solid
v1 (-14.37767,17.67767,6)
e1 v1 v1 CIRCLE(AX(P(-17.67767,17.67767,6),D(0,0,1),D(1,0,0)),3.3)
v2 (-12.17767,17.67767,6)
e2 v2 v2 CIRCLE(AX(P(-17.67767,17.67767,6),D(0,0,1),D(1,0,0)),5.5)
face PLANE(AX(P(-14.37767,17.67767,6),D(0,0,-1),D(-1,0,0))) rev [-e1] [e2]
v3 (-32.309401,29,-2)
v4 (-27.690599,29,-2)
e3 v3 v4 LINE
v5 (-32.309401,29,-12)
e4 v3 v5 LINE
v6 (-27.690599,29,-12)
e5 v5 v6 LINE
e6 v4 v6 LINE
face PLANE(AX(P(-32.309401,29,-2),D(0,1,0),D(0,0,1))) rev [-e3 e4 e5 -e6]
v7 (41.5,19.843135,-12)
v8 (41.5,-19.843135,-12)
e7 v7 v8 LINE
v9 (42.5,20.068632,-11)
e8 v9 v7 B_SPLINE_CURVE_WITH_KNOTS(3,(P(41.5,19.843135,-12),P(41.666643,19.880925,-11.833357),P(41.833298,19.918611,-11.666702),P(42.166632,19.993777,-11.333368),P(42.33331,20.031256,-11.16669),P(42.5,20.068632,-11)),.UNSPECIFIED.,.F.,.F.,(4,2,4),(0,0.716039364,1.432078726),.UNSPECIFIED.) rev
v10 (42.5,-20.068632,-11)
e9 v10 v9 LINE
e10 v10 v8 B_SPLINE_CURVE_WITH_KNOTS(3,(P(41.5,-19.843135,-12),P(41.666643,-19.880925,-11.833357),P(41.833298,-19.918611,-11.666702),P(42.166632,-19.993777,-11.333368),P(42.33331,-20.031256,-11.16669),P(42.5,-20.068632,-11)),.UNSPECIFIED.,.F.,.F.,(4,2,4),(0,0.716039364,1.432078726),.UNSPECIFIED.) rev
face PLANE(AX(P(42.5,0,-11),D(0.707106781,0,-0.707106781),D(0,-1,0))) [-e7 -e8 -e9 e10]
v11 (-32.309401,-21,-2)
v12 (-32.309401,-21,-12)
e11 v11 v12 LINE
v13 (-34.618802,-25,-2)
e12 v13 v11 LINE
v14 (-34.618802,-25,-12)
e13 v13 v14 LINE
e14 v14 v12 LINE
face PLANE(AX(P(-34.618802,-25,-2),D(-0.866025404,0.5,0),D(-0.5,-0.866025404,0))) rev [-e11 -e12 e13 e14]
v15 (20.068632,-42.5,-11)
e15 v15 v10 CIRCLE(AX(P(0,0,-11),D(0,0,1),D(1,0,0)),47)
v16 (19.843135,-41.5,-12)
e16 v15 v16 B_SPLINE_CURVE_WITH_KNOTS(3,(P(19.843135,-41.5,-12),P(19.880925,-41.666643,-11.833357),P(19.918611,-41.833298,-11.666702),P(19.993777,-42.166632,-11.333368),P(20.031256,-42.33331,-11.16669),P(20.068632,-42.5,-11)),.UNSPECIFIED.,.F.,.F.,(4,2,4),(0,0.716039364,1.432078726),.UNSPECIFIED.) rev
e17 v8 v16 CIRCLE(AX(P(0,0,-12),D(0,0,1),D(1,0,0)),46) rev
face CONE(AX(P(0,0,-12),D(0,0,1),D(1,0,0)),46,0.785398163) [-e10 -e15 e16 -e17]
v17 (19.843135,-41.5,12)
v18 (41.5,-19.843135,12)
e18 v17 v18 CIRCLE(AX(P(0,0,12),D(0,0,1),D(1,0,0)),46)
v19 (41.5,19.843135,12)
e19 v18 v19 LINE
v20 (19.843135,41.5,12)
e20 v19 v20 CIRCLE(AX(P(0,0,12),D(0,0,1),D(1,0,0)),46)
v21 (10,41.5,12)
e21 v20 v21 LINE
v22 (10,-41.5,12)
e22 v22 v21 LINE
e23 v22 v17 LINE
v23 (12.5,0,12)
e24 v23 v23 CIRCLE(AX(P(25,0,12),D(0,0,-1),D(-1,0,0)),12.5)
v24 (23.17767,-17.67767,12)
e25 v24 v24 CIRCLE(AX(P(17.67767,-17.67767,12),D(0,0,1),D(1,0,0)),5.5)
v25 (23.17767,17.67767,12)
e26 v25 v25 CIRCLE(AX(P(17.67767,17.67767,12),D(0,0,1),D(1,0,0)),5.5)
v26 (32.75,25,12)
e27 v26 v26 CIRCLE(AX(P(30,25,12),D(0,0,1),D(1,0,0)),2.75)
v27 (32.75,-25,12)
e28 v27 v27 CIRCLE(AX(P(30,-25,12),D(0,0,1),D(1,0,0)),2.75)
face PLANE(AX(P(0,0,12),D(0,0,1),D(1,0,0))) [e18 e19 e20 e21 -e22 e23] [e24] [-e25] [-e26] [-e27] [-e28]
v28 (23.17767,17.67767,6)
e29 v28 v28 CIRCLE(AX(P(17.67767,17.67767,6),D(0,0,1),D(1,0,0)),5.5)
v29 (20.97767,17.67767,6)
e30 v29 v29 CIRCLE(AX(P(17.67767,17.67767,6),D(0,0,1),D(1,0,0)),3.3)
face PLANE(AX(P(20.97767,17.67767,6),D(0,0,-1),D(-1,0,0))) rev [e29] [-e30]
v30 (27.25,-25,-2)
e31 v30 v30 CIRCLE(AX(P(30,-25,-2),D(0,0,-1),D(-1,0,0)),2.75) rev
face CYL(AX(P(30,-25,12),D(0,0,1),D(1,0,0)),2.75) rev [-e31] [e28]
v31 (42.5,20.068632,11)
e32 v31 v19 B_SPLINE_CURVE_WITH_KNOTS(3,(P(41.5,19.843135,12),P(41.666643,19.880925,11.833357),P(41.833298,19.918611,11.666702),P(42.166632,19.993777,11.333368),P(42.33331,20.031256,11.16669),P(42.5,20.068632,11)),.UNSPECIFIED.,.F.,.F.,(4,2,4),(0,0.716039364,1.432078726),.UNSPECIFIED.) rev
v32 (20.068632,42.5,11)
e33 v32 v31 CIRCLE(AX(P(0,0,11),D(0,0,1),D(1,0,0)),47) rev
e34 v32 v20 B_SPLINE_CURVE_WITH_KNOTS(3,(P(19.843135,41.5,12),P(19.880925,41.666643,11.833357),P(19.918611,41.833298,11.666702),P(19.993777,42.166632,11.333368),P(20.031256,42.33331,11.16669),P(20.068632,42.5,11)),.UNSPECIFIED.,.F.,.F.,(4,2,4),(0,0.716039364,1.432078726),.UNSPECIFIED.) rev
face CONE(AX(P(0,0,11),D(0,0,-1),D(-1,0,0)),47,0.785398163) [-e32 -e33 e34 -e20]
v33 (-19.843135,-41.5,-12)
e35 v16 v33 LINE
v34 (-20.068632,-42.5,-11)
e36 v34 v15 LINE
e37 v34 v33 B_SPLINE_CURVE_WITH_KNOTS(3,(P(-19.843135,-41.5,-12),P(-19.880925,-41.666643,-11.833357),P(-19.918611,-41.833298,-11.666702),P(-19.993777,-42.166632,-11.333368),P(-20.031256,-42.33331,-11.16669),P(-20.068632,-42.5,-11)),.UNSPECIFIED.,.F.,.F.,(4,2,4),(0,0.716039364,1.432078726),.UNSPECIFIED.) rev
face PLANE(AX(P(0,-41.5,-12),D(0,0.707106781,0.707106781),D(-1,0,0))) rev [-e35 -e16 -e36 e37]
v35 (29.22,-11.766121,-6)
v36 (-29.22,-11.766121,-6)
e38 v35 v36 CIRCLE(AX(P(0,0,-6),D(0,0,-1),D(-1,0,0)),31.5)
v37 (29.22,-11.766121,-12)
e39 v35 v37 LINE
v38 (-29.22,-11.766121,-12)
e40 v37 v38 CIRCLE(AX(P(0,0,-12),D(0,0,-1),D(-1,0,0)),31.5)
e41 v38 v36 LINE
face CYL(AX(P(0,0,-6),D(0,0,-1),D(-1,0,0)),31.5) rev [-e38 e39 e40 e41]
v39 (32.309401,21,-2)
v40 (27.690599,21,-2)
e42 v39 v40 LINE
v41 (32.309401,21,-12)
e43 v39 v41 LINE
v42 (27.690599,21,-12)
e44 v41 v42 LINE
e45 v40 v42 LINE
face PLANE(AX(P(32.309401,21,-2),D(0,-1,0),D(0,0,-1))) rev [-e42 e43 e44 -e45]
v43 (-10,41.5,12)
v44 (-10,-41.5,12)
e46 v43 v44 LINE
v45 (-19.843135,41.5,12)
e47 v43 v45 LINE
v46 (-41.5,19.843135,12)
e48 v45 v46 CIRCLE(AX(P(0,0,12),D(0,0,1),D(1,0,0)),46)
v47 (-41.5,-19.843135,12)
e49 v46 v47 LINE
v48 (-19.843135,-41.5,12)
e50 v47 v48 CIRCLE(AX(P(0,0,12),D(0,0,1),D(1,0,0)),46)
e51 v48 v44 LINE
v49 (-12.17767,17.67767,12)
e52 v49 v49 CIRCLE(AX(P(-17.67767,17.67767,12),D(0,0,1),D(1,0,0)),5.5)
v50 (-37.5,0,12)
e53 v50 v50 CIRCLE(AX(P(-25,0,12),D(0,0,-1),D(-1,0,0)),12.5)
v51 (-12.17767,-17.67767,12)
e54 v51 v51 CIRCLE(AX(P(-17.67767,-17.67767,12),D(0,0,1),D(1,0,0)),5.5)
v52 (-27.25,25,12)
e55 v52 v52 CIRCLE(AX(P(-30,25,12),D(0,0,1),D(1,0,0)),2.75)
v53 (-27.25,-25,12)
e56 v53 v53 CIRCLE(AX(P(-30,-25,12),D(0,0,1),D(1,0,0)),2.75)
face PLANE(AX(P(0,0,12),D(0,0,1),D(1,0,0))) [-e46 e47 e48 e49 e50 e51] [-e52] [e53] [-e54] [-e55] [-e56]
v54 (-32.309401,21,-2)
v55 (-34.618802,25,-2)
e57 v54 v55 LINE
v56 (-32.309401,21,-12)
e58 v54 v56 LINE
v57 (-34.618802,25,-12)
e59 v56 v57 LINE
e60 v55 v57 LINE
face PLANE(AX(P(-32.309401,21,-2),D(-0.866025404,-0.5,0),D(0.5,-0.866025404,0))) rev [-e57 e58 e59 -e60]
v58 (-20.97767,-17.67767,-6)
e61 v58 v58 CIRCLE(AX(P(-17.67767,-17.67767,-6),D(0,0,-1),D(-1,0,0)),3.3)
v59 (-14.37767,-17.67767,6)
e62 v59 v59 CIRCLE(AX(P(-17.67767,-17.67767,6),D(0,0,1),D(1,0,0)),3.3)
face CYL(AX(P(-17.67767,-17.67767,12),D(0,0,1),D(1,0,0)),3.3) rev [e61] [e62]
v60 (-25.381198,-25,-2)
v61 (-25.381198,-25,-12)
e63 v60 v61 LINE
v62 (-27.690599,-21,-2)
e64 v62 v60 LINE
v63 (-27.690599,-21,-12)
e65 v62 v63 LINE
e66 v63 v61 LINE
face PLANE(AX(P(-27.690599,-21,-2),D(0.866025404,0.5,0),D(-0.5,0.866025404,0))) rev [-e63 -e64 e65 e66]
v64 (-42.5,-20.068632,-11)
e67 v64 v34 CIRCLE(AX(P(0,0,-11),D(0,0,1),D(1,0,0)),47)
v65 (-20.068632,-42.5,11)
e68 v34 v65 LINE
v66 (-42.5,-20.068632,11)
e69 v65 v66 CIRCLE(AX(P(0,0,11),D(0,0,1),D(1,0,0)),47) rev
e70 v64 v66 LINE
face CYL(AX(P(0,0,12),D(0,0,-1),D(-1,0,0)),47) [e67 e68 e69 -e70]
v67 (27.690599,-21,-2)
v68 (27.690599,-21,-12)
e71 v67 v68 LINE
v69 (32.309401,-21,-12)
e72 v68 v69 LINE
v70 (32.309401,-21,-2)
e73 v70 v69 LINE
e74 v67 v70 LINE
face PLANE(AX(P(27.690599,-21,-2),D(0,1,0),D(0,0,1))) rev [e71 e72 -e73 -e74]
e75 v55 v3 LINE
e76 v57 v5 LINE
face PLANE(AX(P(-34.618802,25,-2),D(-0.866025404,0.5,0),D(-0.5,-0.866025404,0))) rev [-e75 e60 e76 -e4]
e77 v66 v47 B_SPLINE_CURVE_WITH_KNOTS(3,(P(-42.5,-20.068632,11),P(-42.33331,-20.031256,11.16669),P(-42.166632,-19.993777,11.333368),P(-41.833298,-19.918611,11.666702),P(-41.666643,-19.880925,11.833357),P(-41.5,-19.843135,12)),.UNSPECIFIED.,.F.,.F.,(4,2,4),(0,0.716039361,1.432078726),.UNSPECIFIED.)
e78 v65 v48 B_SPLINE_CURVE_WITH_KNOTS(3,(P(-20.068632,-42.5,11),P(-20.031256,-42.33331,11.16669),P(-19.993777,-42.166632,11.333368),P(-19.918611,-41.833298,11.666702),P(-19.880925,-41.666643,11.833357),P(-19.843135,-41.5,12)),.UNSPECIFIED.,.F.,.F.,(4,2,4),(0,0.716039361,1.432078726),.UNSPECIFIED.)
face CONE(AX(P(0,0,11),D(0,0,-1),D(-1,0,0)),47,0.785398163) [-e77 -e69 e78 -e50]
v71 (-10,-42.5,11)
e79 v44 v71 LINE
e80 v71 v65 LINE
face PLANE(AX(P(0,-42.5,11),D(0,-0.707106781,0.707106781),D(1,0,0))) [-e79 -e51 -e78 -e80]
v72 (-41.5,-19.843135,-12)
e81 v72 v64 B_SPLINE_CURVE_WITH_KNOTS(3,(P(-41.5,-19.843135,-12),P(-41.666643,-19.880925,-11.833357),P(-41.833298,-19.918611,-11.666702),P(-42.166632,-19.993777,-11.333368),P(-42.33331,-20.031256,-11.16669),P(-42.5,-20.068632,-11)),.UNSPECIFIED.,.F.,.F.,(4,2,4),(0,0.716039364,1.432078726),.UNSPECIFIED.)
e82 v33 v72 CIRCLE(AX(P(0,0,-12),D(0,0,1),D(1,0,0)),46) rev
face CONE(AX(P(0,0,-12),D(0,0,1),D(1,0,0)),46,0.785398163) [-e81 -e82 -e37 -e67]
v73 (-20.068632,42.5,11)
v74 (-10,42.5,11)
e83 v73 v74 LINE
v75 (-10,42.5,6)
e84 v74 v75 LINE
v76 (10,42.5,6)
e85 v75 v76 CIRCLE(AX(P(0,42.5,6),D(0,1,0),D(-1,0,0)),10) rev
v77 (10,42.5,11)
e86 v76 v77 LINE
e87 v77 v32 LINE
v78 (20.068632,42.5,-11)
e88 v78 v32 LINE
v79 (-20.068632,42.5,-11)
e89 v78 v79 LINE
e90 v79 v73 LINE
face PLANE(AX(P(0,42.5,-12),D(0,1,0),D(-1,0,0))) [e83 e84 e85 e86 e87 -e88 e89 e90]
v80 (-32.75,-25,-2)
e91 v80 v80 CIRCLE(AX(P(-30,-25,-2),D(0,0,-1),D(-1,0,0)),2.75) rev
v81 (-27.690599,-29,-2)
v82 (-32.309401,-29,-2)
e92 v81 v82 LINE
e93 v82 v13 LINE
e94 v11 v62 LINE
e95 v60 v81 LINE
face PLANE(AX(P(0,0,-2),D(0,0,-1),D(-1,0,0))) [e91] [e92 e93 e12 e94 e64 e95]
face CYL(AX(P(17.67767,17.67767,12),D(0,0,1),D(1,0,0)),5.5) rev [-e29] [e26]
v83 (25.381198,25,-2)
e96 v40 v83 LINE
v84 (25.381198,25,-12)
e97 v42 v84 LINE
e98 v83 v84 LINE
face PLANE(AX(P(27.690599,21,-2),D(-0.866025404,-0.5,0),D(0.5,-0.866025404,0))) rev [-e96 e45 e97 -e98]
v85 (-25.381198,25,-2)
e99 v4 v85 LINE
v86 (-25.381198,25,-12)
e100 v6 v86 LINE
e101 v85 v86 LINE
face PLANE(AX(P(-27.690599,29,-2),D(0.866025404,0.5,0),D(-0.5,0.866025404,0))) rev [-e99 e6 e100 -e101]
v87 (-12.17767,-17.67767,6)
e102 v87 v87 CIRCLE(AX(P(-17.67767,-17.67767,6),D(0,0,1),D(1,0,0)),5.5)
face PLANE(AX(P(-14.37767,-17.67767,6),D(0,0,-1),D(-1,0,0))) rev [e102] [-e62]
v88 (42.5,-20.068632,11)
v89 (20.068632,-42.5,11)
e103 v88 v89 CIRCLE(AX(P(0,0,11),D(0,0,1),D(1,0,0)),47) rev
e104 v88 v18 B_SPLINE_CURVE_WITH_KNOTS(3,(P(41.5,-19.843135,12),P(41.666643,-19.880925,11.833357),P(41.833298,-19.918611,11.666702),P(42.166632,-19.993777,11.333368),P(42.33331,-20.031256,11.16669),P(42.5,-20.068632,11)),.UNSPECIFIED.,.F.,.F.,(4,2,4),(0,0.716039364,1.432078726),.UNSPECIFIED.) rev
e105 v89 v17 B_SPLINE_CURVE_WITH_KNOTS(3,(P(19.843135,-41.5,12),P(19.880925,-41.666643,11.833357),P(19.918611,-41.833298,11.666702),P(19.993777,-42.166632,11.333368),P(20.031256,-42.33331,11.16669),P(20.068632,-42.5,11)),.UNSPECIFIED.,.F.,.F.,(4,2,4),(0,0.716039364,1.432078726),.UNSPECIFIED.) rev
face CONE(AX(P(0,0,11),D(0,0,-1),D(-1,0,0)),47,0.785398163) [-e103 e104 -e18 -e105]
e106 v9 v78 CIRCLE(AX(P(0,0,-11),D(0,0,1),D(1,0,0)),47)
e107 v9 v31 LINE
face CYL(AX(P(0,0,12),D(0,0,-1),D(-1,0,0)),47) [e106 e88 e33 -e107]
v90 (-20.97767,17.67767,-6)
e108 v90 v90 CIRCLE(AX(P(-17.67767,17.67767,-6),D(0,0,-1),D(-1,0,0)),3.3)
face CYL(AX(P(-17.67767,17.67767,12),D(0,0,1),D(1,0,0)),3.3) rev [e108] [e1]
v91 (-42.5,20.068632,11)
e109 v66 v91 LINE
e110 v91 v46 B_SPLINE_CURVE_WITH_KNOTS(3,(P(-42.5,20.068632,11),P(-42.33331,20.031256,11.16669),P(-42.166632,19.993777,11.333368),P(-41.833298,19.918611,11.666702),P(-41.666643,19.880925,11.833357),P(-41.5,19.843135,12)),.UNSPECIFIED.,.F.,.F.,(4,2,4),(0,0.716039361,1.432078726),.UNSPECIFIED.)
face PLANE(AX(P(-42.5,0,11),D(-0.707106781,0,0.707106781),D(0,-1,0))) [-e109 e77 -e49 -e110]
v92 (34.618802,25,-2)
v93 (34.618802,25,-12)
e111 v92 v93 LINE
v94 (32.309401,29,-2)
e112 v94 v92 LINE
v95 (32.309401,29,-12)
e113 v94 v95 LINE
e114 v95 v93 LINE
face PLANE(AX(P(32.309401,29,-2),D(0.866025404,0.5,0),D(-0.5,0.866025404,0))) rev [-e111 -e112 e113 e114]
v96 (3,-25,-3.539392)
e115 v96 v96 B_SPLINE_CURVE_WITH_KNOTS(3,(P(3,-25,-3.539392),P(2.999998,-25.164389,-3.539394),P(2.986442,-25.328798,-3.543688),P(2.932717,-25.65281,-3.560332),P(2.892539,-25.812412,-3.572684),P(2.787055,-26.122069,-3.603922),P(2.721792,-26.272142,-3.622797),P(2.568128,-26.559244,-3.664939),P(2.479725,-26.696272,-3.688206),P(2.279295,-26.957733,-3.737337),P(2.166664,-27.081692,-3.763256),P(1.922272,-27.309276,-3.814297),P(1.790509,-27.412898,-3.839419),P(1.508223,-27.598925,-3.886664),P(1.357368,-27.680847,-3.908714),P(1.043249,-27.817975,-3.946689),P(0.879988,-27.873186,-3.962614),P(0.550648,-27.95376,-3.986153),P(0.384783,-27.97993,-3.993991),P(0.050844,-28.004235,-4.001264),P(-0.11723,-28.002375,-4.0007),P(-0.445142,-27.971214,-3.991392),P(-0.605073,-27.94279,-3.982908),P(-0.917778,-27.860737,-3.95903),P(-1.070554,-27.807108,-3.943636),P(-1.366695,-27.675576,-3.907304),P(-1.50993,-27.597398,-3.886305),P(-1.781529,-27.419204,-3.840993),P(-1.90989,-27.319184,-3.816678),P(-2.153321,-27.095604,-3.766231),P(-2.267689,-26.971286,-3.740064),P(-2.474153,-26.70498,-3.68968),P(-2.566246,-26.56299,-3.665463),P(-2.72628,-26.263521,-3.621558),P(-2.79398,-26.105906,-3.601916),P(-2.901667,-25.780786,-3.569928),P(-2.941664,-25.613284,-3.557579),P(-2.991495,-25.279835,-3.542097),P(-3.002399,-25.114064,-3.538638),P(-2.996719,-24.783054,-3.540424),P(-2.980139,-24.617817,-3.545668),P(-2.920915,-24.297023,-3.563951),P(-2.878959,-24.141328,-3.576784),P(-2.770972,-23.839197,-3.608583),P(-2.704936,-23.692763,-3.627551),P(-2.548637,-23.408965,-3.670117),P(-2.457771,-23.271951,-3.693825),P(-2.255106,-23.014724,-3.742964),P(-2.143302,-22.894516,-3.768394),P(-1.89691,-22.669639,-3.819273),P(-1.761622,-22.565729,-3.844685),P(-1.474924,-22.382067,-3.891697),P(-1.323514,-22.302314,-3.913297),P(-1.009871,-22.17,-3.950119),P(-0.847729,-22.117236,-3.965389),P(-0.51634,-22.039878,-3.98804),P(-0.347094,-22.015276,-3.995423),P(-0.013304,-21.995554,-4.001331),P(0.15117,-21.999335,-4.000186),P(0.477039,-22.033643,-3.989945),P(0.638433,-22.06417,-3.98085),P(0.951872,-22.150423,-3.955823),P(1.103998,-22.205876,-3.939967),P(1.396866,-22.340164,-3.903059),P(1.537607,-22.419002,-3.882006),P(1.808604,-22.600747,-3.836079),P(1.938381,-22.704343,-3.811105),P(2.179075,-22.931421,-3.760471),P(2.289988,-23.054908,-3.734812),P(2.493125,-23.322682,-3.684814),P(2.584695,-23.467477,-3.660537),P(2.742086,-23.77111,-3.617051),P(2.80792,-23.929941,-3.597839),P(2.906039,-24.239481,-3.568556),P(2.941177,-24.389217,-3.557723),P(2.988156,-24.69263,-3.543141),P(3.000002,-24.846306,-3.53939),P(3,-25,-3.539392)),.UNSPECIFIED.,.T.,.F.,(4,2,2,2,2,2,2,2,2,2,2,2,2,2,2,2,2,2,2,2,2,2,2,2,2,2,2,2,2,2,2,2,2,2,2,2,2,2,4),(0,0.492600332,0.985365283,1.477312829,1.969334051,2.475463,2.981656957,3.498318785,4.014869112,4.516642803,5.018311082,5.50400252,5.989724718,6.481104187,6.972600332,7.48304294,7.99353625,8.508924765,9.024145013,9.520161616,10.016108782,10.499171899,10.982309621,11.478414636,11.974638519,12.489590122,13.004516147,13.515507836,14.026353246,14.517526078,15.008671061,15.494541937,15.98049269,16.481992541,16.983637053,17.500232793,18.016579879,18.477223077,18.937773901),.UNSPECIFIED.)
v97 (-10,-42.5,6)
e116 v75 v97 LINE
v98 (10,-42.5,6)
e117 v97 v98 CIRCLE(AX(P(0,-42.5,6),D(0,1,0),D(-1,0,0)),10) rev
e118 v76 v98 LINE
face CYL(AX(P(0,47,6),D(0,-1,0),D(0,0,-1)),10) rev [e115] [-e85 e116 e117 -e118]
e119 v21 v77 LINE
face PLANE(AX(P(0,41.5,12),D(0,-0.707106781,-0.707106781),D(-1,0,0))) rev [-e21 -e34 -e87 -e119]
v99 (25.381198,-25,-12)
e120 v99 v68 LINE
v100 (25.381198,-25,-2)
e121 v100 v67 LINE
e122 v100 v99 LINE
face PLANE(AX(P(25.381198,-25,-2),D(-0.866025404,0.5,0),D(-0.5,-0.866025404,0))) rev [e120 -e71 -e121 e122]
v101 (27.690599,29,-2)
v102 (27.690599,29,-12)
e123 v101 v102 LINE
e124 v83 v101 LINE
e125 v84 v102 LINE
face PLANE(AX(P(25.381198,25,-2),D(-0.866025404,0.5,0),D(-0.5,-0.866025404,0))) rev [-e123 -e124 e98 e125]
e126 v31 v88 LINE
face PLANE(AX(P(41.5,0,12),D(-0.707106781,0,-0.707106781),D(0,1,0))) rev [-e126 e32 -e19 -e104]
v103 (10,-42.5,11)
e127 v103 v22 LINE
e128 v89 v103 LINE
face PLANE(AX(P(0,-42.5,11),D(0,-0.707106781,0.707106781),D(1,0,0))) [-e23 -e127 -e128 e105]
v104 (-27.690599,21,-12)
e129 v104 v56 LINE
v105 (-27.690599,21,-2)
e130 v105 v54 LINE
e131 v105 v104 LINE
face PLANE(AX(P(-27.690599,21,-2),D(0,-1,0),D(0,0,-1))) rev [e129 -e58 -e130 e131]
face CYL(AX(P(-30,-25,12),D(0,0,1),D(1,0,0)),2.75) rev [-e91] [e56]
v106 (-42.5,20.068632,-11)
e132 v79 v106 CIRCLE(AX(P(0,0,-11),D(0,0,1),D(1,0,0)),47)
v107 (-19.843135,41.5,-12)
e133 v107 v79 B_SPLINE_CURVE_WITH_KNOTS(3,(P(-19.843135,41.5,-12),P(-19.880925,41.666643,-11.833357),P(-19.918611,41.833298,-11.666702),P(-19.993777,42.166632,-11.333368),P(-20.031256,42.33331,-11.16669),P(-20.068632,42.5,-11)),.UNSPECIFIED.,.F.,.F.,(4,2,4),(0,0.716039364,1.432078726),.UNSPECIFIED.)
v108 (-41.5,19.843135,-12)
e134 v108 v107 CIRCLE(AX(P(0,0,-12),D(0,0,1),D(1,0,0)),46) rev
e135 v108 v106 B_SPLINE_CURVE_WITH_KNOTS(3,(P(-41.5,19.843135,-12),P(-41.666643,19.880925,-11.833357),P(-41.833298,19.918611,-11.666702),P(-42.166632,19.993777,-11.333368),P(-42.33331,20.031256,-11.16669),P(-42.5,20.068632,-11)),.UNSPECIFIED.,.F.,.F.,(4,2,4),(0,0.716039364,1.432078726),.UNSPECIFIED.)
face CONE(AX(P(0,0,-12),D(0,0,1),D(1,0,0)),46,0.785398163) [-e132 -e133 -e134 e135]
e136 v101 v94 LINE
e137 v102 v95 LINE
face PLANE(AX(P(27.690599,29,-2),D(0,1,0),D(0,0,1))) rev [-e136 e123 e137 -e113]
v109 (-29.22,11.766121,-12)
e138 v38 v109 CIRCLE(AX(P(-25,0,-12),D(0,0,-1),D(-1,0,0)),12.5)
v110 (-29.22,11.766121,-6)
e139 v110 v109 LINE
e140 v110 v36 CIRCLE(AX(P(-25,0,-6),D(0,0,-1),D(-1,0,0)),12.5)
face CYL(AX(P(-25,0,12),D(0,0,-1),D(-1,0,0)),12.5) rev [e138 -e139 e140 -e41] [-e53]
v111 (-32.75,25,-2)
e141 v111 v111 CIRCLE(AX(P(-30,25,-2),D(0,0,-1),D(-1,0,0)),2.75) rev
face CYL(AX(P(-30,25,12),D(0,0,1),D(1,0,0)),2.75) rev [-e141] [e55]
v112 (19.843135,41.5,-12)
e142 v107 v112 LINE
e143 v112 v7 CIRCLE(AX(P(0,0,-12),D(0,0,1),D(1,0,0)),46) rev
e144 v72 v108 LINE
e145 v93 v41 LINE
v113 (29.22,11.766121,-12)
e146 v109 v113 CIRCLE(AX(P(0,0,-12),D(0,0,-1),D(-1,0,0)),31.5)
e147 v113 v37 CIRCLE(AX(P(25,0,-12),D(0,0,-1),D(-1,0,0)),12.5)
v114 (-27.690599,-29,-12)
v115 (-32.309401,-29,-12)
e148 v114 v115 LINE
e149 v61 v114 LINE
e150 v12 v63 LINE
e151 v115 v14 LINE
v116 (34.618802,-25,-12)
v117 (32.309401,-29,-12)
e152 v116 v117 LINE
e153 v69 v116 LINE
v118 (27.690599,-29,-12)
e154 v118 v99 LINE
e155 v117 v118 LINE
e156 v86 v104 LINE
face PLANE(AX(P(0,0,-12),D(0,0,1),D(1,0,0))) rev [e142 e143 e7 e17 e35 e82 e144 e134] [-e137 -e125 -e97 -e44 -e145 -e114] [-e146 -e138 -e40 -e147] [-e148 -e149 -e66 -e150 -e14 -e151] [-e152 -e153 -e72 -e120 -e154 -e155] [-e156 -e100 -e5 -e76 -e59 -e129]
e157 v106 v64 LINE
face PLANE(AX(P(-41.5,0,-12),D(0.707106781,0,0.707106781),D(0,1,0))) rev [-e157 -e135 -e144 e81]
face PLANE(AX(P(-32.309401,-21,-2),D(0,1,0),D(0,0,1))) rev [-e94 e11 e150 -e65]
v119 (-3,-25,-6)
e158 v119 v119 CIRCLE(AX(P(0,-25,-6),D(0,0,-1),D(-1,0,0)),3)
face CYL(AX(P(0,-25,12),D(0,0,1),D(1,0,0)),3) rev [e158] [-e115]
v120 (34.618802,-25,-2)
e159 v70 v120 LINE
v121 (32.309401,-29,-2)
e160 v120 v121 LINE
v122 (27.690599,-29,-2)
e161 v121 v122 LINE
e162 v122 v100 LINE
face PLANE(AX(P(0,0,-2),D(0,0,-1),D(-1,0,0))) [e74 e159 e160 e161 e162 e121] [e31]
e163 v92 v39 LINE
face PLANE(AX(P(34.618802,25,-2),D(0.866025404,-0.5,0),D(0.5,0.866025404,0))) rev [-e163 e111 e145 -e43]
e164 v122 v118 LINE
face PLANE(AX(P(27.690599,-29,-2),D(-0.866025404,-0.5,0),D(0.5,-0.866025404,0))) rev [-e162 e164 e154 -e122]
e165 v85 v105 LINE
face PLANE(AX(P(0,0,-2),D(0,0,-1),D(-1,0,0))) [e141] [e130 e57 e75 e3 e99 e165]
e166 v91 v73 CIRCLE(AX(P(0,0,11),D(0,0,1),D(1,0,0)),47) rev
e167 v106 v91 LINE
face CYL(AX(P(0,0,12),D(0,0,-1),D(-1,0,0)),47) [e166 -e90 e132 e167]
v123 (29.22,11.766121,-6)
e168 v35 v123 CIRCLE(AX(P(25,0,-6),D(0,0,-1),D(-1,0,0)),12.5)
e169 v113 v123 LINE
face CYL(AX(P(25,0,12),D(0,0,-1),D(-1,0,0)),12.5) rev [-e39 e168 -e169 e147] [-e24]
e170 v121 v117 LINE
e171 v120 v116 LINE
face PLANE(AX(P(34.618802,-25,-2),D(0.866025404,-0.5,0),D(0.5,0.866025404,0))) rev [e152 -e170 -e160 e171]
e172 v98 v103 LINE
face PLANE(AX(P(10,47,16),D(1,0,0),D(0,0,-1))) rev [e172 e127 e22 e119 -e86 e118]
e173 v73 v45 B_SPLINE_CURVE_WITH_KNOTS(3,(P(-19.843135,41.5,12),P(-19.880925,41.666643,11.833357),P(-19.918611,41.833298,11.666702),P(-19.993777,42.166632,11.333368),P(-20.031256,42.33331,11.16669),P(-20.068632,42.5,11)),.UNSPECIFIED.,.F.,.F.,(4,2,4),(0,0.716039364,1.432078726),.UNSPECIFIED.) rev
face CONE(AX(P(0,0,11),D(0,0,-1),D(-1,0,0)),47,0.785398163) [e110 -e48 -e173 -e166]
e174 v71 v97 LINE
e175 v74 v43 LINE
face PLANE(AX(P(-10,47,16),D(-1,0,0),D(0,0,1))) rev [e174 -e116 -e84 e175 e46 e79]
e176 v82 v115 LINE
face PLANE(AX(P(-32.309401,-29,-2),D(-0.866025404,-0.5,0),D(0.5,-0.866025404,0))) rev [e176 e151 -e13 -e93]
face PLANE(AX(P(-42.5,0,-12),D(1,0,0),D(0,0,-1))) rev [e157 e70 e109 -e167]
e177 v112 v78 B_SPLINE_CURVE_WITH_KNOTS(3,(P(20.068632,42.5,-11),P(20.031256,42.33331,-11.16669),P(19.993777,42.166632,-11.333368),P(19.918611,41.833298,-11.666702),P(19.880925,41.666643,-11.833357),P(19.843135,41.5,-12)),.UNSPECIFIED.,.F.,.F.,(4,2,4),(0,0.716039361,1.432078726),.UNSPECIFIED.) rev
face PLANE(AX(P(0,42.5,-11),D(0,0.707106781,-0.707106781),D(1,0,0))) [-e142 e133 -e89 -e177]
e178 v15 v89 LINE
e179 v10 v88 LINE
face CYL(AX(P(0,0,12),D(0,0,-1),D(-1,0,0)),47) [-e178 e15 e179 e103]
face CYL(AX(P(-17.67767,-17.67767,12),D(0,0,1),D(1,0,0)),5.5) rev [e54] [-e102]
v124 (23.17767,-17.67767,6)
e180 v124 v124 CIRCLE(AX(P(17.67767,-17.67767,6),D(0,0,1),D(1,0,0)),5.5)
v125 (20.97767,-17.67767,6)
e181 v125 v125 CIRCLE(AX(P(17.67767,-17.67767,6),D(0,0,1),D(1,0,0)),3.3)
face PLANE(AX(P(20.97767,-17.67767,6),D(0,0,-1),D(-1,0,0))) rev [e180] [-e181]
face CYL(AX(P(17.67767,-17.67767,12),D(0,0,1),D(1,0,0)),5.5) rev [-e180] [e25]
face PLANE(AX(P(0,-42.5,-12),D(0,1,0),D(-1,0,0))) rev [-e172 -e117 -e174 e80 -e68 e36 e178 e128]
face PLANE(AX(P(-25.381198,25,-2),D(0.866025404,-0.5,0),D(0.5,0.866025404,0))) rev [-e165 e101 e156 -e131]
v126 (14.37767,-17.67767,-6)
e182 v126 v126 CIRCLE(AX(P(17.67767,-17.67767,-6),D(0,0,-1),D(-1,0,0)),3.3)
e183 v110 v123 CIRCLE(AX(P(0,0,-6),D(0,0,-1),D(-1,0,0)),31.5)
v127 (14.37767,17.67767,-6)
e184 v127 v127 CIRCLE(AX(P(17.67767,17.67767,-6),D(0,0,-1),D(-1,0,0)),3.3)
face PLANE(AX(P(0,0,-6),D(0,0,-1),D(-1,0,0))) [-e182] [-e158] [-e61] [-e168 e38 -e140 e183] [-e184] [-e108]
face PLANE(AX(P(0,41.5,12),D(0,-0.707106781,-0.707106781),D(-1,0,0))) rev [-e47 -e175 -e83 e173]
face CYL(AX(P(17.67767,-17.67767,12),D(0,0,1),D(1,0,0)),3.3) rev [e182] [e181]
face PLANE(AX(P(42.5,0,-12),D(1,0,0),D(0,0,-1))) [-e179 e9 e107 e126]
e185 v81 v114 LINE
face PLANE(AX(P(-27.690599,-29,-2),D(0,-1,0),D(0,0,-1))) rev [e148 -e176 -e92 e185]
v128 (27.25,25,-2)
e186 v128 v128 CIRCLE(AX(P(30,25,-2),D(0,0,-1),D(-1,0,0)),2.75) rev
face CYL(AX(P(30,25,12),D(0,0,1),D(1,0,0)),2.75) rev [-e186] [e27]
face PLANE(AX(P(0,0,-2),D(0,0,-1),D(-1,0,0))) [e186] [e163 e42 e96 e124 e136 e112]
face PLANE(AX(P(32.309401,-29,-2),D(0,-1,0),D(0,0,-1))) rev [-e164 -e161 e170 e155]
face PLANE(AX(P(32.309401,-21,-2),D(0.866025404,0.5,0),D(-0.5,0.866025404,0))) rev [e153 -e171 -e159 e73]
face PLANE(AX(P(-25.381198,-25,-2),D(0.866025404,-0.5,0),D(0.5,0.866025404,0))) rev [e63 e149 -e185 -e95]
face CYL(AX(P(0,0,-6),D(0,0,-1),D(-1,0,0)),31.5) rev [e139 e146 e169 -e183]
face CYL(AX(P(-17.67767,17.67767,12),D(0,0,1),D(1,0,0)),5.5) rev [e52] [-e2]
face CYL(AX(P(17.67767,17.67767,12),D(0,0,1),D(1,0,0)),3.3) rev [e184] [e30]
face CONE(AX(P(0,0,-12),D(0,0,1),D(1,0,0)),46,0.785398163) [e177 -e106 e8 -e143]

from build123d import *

# Parameters (mm, degrees)
SKETCH1_W                        = 70
SKETCH1_H                        = 50
BOSS_EXTRUDE1_DEPTH              = 12
SKETCH4_R                        = 47
BOSS_EXTRUDE2_DEPTH              = 24
SKETCH2_R                        = 31.5
CUT_EXTRUDE1_DEPTH               = 6
CBORE_START                      = -6
CBORE_FOR_M6_SHCS1_OUTLINE_R     = 3.3
CBORE_FOR_M6_SHCS1_DEPTH         = 18
CBORE_START_2                    = 6
CBORE_FOR_M6_SHCS1_2_OUTLINE_R   = 5.5
CBORE_FOR_M6_SHCS1_2_OUTLINE_R_2 = 3.3
CBORE_FOR_M6_SHCS1_2_DEPTH       = 6
CUT_EXTRUDE6_DEPTH               = 68.542579163
CUT_EXTRUDE6_DEPTH_BACK          = 68.542579163
M5_CLEARANCE_HOLE2_D             = 5.5
F_6_0MM_PRESS_DOWEL_HOLE2_D      = 6
SKETCH22_R                       = 12.5
CUT_EXTRUDE7_DEPTH               = 71.668239144
CUT_EXTRUDE8_DEPTH               = 10
CUT_EXTRUDE9_DEPTH               = 71.668239144
CHAMFER2_SIZE                    = 1


# Read off the part's stored shape, not the designer's step: CBORE for M6 SHCS1
with BuildPart() as part:
    # Sketch1 → Boss-Extrude1 (new, symmetric)
    with BuildSketch(Plane.XY):
        Rectangle(SKETCH1_W, SKETCH1_H)
    extrude(amount=BOSS_EXTRUDE1_DEPTH, both=True)

    # Sketch4 → Boss-Extrude2 (add, through all)
    with BuildSketch(Plane(origin=(0, 0, -12), x_dir=(-1, 0, 0), z_dir=(0, 0, -1))):
        Circle(SKETCH4_R)
    extrude(amount=-BOSS_EXTRUDE2_DEPTH)

    # Sketch2 → Cut-Extrude1 (cut)
    with BuildSketch(Plane(origin=(0, 0, -12), x_dir=(-1, 0, 0), z_dir=(0, 0, -1))):
        Circle(SKETCH2_R)
    extrude(amount=-CUT_EXTRUDE1_DEPTH, mode=Mode.SUBTRACT)

    # CBORE for M6 SHCS1 outline → CBORE for M6 SHCS1 (cut)
    with BuildSketch(Plane.XY.offset(CBORE_START)):
        with Locations((-17.67766953, -17.67766953)):
            Circle(CBORE_FOR_M6_SHCS1_OUTLINE_R)
        with Locations((-17.67766953, 17.67766953)):
            Circle(CBORE_FOR_M6_SHCS1_OUTLINE_R)
        with Locations((17.67766953, 17.67766953)):
            Circle(CBORE_FOR_M6_SHCS1_OUTLINE_R)
        with Locations((17.67766953, -17.67766953)):
            Circle(CBORE_FOR_M6_SHCS1_OUTLINE_R)
    extrude(amount=CBORE_FOR_M6_SHCS1_DEPTH, mode=Mode.SUBTRACT)

    # CBORE for M6 SHCS1 2 outline → CBORE for M6 SHCS1 2 (cut)
    # profile 1 of 4: a face of its own
    with BuildSketch(Plane.XY.offset(CBORE_START_2)):
        with Locations((-17.67766953, -17.67766953)):
            Circle(CBORE_FOR_M6_SHCS1_2_OUTLINE_R)
        with Locations((-17.67766953, -17.67766953)):
            Circle(CBORE_FOR_M6_SHCS1_2_OUTLINE_R_2, mode=Mode.SUBTRACT)
    # profile 2 of 4: a face of its own
    with BuildSketch(Plane.XY.offset(CBORE_START_2)):
        with Locations((-17.67766953, 17.67766953)):
            Circle(CBORE_FOR_M6_SHCS1_2_OUTLINE_R)
        with Locations((-17.67766953, 17.67766953)):
            Circle(CBORE_FOR_M6_SHCS1_2_OUTLINE_R_2, mode=Mode.SUBTRACT)
    # profile 3 of 4: a face of its own
    with BuildSketch(Plane.XY.offset(CBORE_START_2)):
        with Locations((17.67766953, 17.67766953)):
            Circle(CBORE_FOR_M6_SHCS1_2_OUTLINE_R)
        with Locations((17.67766953, 17.67766953)):
            Circle(CBORE_FOR_M6_SHCS1_2_OUTLINE_R_2, mode=Mode.SUBTRACT)
    # profile 4 of 4: a face of its own
    with BuildSketch(Plane.XY.offset(CBORE_START_2)):
        with Locations((17.67766953, -17.67766953)):
            Circle(CBORE_FOR_M6_SHCS1_2_OUTLINE_R)
        with Locations((17.67766953, -17.67766953)):
            Circle(CBORE_FOR_M6_SHCS1_2_OUTLINE_R_2, mode=Mode.SUBTRACT)
    extrude(amount=CBORE_FOR_M6_SHCS1_2_DEPTH, mode=Mode.SUBTRACT)

    # Sketch17 → Cut-Extrude6 (cut, two sides: drawn at the far end of the back side and taken through both)
    with BuildSketch(Plane.XZ.offset(-CUT_EXTRUDE6_DEPTH_BACK)):
        with BuildLine():
            Line((10, 16), (10, 6))
            ThreePointArc((10, 6), (0, -4), (-10, 6))
            Line((-10, 6), (-10, 16))
            ThreePointArc((-10, 16), (0, 26), (10, 16))
        make_face()
    extrude(amount=CUT_EXTRUDE6_DEPTH + CUT_EXTRUDE6_DEPTH_BACK, mode=Mode.SUBTRACT)

    # M5 Clearance Hole2 (through all)
    with Locations(Plane.XY.offset(12)):
        with Locations((-30, 25), (-30, -25), (30, -25), (30, 25)):
            Hole(M5_CLEARANCE_HOLE2_D / 2)

    # Ø6.0mm Press Dowel Hole2 (through all)
    with Locations(Plane.XY.offset(12)):
        with Locations((0, -25)):
            Hole(F_6_0MM_PRESS_DOWEL_HOLE2_D / 2)

    # Sketch22 → Cut-Extrude7 (cut, through all)
    with BuildSketch(Plane(origin=(0, 0, -12), x_dir=(-1, 0, 0), z_dir=(0, 0, -1))):
        with Locations((-25, 0)):
            Circle(SKETCH22_R)
        with Locations((25, 0)):
            Circle(SKETCH22_R)
    extrude(amount=-CUT_EXTRUDE7_DEPTH, mode=Mode.SUBTRACT)

    # Sketch23 → Cut-Extrude8 (cut)
    with BuildSketch(Plane(origin=(0, 0, -12), x_dir=(-1, 0, 0), z_dir=(0, 0, -1))):
        Polygon((-27.690598923, 29), (-32.309401077, 29), (-34.618802154, 25), (-32.309401077, 21), (-27.690598923, 21), (-25.381197846, 25), align=None)
        Polygon((-32.309401077, -21), (-34.618802154, -25), (-32.309401077, -29), (-27.690598923, -29), (-25.381197846, -25), (-27.690598923, -21), align=None)
        Polygon((32.309401077, -21), (27.690598923, -21), (25.381197846, -25), (27.690598923, -29), (32.309401077, -29), (34.618802154, -25), align=None)
        Polygon((27.690598923, 29), (25.381197846, 25), (27.690598923, 21), (32.309401077, 21), (34.618802154, 25), (32.309401077, 29), align=None)
    extrude(amount=-CUT_EXTRUDE8_DEPTH, mode=Mode.SUBTRACT)

    # Sketch24 → Cut-Extrude9 (cut, through all)
    with BuildSketch(Plane.XY.offset(12)):
        with BuildLine():
            ThreePointArc((-20.06863224, -42.5), (-15.131468813, -44.497625235), (-10, -45.923850013))
            Line((-10, -45.923850013), (-10, -42.5))
            Line((-10, -42.5), (-20.06863224, -42.5))
        make_face()
        with BuildLine():
            Line((-10, -42.5), (-10, -45.923850013))
            ThreePointArc((-10, -45.923850013), (0, -47), (10, -45.923850013))
            Line((10, -45.923850013), (10, -42.5))
            Line((10, -42.5), (-10, -42.5))
        make_face()
        with BuildLine():
            Line((10, -42.5), (10, -45.923850013))
            ThreePointArc((10, -45.923850013), (15.131468813, -44.497625235), (20.06863224, -42.5))
            Line((20.06863224, -42.5), (10, -42.5))
        make_face()
        with BuildLine():
            Line((42.5, 20.06863224), (42.5, -20.06863224))
            ThreePointArc((42.5, -20.06863224), (47, 0), (42.5, 20.06863224))
        make_face()
        with BuildLine():
            Line((10, 45.923850013), (10, 42.5))
            Line((10, 42.5), (20.06863224, 42.5))
            ThreePointArc((20.06863224, 42.5), (15.131468813, 44.497625235), (10, 45.923850013))
        make_face()
        with BuildLine():
            Line((-10, 45.923850013), (-10, 42.5))
            Line((-10, 42.5), (10, 42.5))
            Line((10, 42.5), (10, 45.923850013))
            ThreePointArc((10, 45.923850013), (0, 47), (-10, 45.923850013))
        make_face()
        with BuildLine():
            Line((-20.06863224, 42.5), (-10, 42.5))
            Line((-10, 42.5), (-10, 45.923850013))
            ThreePointArc((-10, 45.923850013), (-15.131468813, 44.497625235), (-20.06863224, 42.5))
        make_face()
        with BuildLine():
            ThreePointArc((-42.5, 20.06863224), (-47, 0), (-42.5, -20.06863224))
            Line((-42.5, -20.06863224), (-42.5, 20.06863224))
        make_face()
    extrude(amount=-CUT_EXTRUDE9_DEPTH, mode=Mode.SUBTRACT)

    # Chamfer2
    chamfer2_edges = [part.edges().sort_by_distance(p)[0] for p in [
        (-33.234018716, 33.234018716, -12),
        (-33.234018716, -33.234018716, 12),
        (-33.234018716, 33.234018716, 12),
        (33.234018716, 33.234018716, -12),
        (33.234018716, -33.234018716, -12),
        (-33.234018716, -33.234018716, -12),
        (33.234018716, 33.234018716, 12),
        (33.234018716, -33.234018716, 12),
        (0, -42.5, -12),
        (15.03431612, -42.5, 12),
        (-15.03431612, -42.5, 12),
        (42.5, 0, 12),
        (42.5, 0, -12),
        (-15.03431612, 42.5, 12),
        (15.03431612, 42.5, 12),
        (0, 42.5, -12),
        (-42.5, 0, -12),
        (-42.5, 0, 12),
    ]]
    chamfer(chamfer2_edges, length=CHAMFER2_SIZE)


solid = part.part
